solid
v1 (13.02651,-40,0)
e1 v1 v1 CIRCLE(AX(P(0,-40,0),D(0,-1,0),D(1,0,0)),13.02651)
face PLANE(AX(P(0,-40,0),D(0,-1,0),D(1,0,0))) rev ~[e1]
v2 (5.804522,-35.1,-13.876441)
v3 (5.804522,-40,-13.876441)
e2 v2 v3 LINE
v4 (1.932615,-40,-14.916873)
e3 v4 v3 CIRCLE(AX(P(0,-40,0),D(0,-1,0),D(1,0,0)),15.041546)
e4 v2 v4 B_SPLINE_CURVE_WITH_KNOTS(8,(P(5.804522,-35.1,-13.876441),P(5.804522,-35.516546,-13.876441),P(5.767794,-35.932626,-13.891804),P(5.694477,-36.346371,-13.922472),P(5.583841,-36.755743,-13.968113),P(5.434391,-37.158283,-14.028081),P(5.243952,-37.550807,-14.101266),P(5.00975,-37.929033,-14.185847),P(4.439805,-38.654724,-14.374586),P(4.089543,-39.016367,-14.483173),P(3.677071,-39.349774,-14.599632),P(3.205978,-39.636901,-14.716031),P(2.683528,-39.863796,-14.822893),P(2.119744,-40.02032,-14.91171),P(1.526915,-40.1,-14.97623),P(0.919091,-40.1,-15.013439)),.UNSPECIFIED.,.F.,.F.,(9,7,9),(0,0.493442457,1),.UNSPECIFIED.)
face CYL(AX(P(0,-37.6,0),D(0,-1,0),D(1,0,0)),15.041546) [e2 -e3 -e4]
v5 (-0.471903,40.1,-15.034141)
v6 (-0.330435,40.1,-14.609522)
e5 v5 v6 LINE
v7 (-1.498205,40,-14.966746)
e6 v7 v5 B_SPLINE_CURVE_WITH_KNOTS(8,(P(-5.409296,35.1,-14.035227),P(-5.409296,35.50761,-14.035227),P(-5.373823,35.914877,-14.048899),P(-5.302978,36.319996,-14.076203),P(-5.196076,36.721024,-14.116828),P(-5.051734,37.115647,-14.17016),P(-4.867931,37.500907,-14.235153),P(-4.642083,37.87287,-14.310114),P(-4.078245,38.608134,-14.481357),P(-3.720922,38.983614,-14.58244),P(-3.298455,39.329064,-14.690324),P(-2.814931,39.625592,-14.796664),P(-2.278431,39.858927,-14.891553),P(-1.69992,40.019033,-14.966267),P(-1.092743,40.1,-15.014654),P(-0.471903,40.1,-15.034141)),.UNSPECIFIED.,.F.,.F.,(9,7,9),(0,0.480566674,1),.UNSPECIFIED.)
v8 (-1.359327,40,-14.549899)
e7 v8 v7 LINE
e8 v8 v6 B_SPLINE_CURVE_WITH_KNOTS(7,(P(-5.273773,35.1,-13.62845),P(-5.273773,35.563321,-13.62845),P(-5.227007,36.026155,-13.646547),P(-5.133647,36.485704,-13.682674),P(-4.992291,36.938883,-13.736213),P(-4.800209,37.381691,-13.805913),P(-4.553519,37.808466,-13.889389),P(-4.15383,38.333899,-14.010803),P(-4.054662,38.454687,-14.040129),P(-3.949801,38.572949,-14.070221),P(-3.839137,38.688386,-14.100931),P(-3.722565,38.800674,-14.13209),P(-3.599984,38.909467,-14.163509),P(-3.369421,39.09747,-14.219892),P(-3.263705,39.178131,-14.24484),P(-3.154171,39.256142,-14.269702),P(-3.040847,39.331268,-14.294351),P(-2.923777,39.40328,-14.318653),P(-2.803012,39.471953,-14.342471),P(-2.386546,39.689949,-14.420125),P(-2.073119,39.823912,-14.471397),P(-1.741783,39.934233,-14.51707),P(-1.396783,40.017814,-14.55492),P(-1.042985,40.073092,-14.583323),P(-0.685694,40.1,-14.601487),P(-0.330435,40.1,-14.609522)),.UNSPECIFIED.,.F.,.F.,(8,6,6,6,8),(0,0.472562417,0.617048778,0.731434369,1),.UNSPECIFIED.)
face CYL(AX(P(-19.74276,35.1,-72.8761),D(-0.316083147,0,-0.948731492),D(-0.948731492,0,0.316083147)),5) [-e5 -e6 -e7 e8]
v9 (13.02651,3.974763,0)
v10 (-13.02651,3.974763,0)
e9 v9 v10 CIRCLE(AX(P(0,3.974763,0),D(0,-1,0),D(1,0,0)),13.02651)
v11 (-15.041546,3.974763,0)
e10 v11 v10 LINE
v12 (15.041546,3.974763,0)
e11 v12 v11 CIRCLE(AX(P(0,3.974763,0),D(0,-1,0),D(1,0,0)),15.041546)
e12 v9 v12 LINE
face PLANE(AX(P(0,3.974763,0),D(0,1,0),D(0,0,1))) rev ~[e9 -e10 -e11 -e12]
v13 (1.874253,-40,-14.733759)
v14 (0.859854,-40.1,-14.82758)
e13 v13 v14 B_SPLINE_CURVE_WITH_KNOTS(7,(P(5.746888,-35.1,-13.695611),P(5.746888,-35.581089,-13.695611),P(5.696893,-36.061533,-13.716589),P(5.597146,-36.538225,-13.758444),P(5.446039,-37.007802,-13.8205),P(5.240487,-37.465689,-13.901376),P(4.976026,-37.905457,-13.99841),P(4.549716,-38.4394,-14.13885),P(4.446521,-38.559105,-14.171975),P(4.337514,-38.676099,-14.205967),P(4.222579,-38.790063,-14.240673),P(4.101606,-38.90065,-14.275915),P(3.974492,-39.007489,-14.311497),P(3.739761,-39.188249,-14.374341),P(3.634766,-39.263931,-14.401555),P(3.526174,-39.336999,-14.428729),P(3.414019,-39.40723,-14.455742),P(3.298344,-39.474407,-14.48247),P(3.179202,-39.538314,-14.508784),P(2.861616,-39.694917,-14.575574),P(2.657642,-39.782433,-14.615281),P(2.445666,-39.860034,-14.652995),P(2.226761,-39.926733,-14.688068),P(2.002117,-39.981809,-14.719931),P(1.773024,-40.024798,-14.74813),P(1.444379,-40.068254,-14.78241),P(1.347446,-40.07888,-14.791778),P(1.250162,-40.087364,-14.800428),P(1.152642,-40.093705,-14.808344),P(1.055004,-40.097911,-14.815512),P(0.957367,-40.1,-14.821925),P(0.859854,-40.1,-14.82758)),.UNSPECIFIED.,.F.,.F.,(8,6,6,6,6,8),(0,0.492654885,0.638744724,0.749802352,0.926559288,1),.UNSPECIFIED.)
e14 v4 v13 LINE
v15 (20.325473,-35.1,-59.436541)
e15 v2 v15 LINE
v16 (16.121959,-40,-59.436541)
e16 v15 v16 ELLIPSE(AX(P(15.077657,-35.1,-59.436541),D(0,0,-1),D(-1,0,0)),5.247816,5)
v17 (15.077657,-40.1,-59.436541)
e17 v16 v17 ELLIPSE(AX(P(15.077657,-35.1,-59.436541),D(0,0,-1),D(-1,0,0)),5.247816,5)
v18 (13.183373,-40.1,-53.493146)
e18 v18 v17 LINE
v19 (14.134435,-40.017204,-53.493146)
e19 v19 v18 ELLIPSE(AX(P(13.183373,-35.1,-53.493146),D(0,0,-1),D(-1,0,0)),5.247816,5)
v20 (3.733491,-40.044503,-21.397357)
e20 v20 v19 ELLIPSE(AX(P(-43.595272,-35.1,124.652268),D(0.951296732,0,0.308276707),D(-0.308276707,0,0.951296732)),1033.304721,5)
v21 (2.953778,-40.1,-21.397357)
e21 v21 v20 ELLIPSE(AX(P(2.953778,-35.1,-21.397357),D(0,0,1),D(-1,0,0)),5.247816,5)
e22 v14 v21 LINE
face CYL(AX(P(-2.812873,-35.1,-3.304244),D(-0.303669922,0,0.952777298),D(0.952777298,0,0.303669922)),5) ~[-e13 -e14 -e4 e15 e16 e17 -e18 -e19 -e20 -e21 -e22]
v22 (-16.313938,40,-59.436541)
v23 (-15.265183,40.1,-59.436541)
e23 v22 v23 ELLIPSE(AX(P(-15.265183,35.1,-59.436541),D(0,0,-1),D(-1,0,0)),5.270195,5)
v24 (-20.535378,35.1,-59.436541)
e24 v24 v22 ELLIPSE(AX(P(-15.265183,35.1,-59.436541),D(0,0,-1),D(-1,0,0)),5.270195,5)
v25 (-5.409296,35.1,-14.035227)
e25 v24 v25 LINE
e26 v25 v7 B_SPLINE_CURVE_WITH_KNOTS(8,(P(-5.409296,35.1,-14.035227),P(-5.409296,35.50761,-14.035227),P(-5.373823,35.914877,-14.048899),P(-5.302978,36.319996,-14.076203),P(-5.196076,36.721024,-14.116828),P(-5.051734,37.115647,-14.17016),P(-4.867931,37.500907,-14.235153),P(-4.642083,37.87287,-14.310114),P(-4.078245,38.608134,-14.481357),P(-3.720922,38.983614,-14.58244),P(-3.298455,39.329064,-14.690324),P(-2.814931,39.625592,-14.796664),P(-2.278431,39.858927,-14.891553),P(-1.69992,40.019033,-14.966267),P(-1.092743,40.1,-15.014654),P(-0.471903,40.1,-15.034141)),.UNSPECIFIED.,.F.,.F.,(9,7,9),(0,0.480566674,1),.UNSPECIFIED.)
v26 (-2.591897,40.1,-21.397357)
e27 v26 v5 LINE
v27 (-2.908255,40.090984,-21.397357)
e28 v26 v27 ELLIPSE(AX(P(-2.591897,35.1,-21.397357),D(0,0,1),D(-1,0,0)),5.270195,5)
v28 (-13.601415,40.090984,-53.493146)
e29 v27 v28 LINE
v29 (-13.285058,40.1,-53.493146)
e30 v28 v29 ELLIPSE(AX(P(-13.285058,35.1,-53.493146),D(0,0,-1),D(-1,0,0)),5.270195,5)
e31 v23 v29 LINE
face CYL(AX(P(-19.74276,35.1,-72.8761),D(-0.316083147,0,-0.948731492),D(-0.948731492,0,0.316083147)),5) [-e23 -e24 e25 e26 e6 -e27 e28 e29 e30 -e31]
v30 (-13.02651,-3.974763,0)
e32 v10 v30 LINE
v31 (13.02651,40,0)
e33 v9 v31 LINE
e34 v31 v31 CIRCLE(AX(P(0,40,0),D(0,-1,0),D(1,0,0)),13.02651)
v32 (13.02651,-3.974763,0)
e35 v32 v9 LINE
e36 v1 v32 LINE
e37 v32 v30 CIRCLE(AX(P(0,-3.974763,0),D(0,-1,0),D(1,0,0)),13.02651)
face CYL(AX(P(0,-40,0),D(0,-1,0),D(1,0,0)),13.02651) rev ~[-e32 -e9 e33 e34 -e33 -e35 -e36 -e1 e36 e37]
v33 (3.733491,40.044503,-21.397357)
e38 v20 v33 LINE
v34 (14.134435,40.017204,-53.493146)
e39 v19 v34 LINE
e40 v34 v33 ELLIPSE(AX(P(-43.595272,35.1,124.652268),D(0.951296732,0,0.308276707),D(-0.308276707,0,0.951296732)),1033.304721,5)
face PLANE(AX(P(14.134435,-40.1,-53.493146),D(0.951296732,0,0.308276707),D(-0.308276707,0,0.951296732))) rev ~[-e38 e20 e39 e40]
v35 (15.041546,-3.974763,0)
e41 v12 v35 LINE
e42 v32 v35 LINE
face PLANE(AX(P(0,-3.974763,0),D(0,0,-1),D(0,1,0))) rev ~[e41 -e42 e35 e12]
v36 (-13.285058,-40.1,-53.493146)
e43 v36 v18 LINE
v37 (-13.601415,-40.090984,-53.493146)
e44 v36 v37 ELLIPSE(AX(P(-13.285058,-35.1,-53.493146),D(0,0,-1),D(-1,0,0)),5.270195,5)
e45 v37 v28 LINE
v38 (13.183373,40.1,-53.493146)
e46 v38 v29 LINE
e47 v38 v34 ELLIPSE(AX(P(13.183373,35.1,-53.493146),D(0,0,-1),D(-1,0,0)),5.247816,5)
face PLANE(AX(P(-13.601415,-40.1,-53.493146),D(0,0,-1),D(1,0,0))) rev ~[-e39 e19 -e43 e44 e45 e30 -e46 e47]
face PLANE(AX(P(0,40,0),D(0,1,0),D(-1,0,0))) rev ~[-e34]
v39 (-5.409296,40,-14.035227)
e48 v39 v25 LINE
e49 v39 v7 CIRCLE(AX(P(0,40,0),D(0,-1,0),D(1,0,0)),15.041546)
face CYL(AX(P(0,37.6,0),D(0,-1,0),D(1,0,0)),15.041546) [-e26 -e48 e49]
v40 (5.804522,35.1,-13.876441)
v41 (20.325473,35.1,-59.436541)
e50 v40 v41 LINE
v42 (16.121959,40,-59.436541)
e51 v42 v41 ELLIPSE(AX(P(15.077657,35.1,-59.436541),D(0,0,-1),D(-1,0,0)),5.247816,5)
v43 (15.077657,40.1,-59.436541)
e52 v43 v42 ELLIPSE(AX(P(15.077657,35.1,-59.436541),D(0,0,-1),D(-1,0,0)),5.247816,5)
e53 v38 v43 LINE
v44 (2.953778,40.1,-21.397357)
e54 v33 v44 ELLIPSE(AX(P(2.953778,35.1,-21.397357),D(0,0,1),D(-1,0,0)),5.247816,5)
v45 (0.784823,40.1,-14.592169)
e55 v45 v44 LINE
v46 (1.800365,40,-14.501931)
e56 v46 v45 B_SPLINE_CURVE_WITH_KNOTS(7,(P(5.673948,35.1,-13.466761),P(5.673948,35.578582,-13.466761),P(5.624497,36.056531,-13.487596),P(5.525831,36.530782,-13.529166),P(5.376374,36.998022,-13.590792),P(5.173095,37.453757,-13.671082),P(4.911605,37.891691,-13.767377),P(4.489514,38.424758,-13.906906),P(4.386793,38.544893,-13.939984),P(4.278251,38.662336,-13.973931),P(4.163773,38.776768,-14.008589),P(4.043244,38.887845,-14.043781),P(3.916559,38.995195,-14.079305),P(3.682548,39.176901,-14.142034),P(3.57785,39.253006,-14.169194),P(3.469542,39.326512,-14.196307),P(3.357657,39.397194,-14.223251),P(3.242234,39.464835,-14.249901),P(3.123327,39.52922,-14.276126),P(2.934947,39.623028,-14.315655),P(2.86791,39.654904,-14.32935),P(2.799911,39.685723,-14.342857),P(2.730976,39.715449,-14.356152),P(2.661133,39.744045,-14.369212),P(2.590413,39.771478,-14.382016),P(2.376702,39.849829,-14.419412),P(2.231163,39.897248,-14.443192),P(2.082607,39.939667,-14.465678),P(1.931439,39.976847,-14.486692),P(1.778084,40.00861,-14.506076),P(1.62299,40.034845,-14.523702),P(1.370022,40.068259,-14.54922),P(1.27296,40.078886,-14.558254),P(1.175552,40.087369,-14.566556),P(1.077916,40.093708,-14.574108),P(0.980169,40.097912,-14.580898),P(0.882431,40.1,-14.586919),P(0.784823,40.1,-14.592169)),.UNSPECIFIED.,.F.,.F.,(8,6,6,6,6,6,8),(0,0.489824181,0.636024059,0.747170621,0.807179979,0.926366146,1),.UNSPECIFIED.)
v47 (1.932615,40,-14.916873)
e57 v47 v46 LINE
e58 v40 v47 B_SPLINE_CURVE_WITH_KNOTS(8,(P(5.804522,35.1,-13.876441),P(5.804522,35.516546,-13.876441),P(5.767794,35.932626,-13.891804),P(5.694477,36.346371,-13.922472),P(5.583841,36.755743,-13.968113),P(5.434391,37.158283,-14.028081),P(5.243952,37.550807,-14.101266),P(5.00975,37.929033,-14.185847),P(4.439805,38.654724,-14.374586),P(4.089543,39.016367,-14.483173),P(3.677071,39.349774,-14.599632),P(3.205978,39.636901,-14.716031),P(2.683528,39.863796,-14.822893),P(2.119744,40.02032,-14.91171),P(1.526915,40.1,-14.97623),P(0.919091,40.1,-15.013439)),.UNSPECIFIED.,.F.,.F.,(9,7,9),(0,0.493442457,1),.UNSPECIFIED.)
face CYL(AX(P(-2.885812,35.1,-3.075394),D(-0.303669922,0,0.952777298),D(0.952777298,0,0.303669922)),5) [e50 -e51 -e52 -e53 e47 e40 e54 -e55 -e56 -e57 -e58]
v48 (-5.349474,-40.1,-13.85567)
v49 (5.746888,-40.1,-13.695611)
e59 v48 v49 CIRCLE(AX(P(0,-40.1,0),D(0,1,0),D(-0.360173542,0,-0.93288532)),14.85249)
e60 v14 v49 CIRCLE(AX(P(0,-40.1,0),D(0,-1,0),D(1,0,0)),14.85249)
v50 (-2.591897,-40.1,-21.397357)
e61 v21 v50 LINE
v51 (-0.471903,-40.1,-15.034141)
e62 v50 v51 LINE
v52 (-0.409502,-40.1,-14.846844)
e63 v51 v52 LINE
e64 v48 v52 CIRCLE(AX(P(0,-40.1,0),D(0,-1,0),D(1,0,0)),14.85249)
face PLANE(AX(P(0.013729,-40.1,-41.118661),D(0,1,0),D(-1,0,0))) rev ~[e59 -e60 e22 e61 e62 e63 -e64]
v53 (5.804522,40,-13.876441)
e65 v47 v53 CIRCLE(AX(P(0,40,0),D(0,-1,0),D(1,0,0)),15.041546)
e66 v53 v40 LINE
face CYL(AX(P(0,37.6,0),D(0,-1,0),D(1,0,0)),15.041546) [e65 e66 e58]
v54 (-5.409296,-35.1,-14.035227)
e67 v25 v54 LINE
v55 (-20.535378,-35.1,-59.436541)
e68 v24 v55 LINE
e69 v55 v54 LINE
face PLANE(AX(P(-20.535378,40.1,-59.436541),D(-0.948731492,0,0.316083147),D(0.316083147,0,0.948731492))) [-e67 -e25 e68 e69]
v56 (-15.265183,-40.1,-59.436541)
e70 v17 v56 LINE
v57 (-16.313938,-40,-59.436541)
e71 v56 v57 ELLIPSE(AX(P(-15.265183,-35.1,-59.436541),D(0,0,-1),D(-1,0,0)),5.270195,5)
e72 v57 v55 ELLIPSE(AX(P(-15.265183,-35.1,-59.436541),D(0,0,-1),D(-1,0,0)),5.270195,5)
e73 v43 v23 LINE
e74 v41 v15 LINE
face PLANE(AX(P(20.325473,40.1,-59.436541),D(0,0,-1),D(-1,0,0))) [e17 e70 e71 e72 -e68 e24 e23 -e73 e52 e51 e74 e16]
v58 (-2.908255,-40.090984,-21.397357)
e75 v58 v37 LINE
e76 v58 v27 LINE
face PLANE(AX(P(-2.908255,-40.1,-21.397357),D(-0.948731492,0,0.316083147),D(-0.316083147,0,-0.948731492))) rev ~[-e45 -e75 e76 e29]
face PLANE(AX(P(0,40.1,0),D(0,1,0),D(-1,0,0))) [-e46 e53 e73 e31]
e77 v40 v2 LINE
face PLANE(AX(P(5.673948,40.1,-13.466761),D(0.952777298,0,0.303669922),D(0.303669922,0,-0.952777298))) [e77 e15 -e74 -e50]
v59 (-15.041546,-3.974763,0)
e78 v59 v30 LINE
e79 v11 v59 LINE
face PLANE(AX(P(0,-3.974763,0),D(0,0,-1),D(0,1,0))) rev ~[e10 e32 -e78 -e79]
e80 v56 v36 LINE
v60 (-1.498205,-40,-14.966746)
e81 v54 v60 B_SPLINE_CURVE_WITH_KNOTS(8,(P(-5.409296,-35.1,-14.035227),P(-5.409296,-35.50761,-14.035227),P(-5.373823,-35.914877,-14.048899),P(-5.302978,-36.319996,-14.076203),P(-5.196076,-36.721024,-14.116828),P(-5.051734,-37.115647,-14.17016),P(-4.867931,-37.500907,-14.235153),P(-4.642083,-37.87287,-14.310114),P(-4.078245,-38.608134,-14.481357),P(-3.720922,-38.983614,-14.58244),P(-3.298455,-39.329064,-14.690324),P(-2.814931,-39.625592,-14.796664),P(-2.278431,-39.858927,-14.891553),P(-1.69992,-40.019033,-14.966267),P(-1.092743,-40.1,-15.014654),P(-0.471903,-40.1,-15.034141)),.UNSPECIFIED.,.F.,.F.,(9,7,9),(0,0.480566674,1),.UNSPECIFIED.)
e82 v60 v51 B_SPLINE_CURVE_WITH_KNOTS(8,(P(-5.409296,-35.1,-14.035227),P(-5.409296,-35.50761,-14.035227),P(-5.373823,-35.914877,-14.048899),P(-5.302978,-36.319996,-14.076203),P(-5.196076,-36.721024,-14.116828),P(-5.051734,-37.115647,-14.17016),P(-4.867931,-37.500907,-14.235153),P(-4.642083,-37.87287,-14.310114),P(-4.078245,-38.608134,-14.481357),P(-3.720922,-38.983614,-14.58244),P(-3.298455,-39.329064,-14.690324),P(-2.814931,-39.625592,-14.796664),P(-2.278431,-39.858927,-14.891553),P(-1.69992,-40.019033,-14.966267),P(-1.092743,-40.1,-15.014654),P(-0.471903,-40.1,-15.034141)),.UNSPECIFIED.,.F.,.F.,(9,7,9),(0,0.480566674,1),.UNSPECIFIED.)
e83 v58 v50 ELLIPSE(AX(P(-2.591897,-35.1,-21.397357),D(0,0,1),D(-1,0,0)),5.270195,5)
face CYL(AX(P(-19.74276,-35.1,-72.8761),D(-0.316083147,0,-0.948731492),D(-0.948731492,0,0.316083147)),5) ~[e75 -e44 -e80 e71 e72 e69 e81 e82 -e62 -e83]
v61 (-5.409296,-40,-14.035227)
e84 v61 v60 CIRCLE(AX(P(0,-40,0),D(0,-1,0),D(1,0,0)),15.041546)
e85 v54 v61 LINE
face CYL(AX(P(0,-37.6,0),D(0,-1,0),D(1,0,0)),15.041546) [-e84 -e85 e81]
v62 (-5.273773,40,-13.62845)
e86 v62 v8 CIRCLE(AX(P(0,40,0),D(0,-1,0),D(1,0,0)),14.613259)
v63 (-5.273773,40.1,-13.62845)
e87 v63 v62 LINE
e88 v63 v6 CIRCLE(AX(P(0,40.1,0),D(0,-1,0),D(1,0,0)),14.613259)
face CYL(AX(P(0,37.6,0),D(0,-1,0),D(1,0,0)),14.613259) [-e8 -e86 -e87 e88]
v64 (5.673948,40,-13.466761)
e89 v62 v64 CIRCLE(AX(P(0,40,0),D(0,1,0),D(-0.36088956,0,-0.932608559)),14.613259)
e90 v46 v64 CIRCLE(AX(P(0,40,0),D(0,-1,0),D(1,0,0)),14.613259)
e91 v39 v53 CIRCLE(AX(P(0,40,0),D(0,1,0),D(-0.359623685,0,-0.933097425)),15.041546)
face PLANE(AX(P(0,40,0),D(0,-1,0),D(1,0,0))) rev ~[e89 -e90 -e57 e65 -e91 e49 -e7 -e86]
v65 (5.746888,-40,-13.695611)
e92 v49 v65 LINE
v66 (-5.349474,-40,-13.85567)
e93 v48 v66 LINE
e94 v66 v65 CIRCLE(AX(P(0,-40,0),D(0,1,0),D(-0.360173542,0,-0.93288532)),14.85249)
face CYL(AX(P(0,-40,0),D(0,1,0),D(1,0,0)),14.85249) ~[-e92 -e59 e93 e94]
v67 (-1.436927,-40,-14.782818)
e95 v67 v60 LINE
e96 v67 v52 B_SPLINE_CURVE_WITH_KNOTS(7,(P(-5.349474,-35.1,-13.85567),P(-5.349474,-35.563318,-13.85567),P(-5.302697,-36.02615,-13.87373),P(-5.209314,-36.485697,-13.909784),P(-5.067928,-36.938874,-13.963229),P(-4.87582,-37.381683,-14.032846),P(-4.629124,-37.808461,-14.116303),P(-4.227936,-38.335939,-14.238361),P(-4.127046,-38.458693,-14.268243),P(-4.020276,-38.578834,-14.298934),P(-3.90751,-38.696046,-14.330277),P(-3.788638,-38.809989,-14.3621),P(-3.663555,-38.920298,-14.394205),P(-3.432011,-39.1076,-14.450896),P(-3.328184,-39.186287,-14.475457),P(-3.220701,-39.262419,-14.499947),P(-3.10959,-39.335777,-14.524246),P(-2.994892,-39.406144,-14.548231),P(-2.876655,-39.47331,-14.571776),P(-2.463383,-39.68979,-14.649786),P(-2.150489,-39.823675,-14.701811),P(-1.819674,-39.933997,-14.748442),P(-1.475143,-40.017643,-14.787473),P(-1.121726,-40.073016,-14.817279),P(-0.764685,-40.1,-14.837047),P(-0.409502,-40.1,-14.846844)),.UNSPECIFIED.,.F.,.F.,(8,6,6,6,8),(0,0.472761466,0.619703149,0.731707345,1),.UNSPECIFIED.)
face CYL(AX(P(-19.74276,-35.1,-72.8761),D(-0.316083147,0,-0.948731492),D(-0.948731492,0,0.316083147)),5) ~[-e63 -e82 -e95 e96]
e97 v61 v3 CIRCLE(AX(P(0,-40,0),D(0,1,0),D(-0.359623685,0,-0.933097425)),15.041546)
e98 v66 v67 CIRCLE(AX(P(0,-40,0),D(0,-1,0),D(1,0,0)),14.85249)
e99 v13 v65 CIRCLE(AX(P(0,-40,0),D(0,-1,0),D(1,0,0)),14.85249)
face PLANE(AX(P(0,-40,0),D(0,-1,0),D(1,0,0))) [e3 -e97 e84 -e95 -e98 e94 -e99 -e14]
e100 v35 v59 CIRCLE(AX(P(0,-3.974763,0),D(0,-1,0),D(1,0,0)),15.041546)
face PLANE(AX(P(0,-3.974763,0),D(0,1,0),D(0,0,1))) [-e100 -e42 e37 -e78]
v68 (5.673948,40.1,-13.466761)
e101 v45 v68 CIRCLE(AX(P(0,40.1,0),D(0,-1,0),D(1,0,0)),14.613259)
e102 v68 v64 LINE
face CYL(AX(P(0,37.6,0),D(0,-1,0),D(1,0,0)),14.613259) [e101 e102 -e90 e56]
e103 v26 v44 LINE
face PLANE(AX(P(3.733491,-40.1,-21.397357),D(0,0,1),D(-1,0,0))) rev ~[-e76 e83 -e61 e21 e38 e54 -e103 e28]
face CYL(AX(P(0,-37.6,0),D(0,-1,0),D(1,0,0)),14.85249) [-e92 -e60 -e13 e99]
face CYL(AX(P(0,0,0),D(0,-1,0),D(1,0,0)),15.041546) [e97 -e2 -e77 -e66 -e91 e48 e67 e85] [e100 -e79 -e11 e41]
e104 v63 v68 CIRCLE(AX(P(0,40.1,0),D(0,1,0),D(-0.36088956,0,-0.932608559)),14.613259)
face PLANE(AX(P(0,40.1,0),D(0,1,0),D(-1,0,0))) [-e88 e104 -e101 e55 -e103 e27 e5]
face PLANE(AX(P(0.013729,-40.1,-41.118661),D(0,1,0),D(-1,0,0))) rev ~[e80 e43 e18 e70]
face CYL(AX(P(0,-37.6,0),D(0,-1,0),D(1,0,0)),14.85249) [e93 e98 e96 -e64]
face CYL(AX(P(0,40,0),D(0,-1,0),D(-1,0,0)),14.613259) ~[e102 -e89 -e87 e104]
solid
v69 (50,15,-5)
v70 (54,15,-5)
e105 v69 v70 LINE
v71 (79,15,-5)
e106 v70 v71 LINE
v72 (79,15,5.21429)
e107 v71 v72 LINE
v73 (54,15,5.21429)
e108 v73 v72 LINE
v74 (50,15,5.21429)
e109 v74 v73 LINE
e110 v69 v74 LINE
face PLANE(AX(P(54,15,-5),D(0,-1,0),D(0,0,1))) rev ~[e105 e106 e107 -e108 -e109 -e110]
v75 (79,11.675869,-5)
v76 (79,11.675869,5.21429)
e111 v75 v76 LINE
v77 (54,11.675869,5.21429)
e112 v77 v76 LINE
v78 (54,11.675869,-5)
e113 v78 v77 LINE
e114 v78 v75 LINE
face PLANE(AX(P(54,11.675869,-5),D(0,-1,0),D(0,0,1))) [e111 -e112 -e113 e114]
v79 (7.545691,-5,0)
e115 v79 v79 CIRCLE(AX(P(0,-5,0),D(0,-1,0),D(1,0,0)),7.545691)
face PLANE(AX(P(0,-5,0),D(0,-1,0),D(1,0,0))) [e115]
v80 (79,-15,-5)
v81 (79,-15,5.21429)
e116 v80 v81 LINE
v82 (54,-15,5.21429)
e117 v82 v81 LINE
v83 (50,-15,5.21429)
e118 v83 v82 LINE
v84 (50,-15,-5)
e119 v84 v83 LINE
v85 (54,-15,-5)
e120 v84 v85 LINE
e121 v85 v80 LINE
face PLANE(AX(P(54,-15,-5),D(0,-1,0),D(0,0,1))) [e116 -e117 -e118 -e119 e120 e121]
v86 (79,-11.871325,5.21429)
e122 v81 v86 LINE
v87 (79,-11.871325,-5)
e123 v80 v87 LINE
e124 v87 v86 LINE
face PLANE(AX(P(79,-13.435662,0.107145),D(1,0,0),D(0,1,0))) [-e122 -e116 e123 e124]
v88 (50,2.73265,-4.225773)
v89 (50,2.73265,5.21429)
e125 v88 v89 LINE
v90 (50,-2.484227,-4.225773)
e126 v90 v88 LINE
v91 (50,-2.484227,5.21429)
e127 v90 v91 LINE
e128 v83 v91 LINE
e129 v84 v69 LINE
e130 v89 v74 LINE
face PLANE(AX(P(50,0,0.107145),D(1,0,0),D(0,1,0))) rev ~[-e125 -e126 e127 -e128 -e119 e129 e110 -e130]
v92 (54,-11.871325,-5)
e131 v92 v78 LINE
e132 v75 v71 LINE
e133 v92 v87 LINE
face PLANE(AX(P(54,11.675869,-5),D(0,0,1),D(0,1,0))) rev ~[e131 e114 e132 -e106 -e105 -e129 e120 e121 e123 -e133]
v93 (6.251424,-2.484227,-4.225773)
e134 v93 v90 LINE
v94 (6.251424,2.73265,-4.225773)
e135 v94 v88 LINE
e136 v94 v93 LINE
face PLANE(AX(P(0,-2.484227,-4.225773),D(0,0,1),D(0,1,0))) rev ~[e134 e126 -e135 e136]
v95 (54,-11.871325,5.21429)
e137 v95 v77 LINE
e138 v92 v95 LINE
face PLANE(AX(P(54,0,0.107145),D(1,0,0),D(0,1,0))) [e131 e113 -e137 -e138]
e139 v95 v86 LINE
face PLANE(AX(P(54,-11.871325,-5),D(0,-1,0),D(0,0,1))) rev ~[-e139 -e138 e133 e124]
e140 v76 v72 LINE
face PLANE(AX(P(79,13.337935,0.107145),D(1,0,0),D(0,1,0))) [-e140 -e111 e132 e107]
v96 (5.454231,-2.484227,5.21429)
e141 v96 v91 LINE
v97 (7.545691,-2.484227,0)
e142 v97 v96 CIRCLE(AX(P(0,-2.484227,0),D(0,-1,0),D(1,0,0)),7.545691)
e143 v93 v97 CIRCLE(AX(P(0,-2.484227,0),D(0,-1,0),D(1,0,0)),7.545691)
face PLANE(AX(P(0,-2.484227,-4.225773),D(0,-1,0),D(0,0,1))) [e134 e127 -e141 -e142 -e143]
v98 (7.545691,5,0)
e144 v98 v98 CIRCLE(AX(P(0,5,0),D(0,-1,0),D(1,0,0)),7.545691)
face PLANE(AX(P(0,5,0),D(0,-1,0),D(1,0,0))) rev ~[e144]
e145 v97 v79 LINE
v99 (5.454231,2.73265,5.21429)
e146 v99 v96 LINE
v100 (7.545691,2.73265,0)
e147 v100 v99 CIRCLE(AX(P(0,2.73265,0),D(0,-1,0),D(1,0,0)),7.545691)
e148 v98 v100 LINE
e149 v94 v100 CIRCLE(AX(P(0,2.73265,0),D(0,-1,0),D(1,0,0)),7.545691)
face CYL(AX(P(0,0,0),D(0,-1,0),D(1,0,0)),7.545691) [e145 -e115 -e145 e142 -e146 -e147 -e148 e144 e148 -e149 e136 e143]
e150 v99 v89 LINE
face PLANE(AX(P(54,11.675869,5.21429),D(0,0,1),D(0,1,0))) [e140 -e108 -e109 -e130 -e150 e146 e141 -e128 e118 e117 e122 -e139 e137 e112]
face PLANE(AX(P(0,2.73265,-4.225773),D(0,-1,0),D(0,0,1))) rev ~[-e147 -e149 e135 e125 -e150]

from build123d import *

# Parameters (mm, degrees)
F0_R          = 15.0415455236
F1_DEPTH      = 40
F2_R          = 13.0265097032
F3_DEPTH      = 80
F4_W          = 7.9495264217
F4_H          = 15.6480446458
F5_DEPTH      = 17.5
F6_R          = 7.5456912494
F7_DEPTH      = 5
F8_W          = 5.216877209
F8_H          = 9.4400634989
F9_DEPTH      = 50
F10_W         = 30
F10_H         = 10.2142902277
F11_DEPTH     = 4
F12_W         = 3.1286751479
F12_H         = 10.2142902277
F13_DEPTH     = 25
F14_W         = 3.3241308853
F14_H         = 10.2142902277
F15_DEPTH     = 25
F16_R         = 14.8524902499
F17_DEPTH     = 0.1
F18_R         = 14.6132587067
F19_DEPTH     = 0.1
F21_DEPTH     = 80.2
F23_DEPTH     = 80.201
F24_T4_DEPTH  = 73.2481904339
F24_S5_R      = 14.6132587067
F24_T6_DEPTH  = 40
F24_T11_DEPTH = 73.2481904339
F24_S12_R     = 15.0415455236
F24_T13_DEPTH = 40
F24_T17_DEPTH = 73.2835146544
F24_S18_R     = 15.0415455236
F24_T19_DEPTH = 40
F24_T23_DEPTH = 73.2835146544
F24_S24_R     = 14.6132587067
F24_T25_DEPTH = 40
F24_T30_DEPTH = 73.0440159481
F24_S31_R     = 15.0415455236
F24_T32_DEPTH = 40
F24_T36_DEPTH = 73.0440159481
F24_S37_R     = 14.8524902499
F24_T38_DEPTH = 40
F24_T43_DEPTH = 73.0079978677
F24_S44_R     = 14.8524902499
F24_T45_DEPTH = 40
F24_T50_DEPTH = 73.0079978677
F24_S51_R     = 15.0415455236
F24_T52_DEPTH = 40


# Not quite as in the source:
# - a fillet or chamfer that OpenCascade refuses, or shapes differently, is made with other operations: its cross-section is extruded or revolved along the edge and cut away or added


with BuildPart() as f1:
    # F0 (on Front) → F1 (new body, symmetric)
    with BuildSketch(Plane.XZ):
        Circle(F0_R)
    extrude(amount=F1_DEPTH, both=True)

    # F2 (on face) → F3 (cut)
    with BuildSketch(Plane.XZ.offset(40)):
        Circle(F2_R)
    extrude(amount=-F3_DEPTH, mode=Mode.SUBTRACT)

    # F4 (on Right) → F5 (cut, symmetric)
    with BuildSketch(Plane.YZ):
        with Locations((0, 7.8240223229)):
            Rectangle(F4_W, F4_H)
    extrude(amount=F5_DEPTH, both=True, mode=Mode.SUBTRACT)

    # F16 (on face) → F17 (join)
    with BuildSketch(Plane.XZ.offset(40)):
        Circle(F16_R)
    extrude(amount=F17_DEPTH)

    # F18 (on face) → F19 (join)
    with BuildSketch(Plane(origin=(0, 40, 0), x_dir=(-1, 0, 0), z_dir=(0, 1, 0))):
        Circle(F18_R)
    extrude(amount=F19_DEPTH)

    # F20 (on face) → F21 (join)
    with BuildSketch(Plane(origin=(0, 40.1, 0), x_dir=(-1, 0, 0), z_dir=(0, 1, 0))):
        Polygon((5.2737725107, -13.6284501516), (-5.6739483665, -13.4667605594), (-20.3254725784, -59.4365410507), (20.5353777856, -59.4365410507), align=None)
    extrude(amount=-F21_DEPTH)

    # F22 (on face) → F23 (cut, through all)
    with BuildSketch(Plane.XZ.offset(40.1)):
        Polygon((-2.9082546706, -21.3973574286), (-13.6014148593, -53.4931458533), (14.1344349831, -53.4931458533), (3.7334910594, -21.3973574286), align=None)
    extrude(amount=-F23_DEPTH, mode=Mode.SUBTRACT)

    # F24: fillet of radius 5 on 4 edges, made by hand


with BuildPart() as f7:
    # F6 (on Front) → F7 (new body, symmetric)
    with BuildSketch(Plane.XZ):
        Circle(F6_R)
    extrude(amount=F7_DEPTH, both=True)

    # F8 (on Right) → F9 (join)
    with BuildSketch(Plane.YZ):
        with Locations((0.1242113067, 0.4942584783)):
            Rectangle(F8_W, F8_H)
    extrude(amount=F9_DEPTH)

    # F10 (on face) → F11 (join)
    with BuildSketch(Plane.YZ.offset(50)):
        with Locations((0, 0.1071451139)):
            Rectangle(F10_W, F10_H)
    extrude(amount=F11_DEPTH)

    # F12 (on face) → F13 (join)
    with BuildSketch(Plane.YZ.offset(54)):
        with Locations((-13.4356624261, 0.1071451139)):
            Rectangle(F12_W, F12_H)
    extrude(amount=F13_DEPTH)

    # F14 (on face) → F15 (join)
    with BuildSketch(Plane.YZ.offset(54)):
        with Locations((13.3379345573, 0.1071451139)):
            Rectangle(F14_W, F14_H)
    extrude(amount=F15_DEPTH)


with BuildPart() as f24_tool2:
    # F24_s3 → F24_t4 (new body)
    with BuildSketch(Plane(origin=(0.6236867561, 0, -1.9568437291), x_dir=(0, 1, 0), z_dir=(0.3036699217, 0, -0.9527772975))):
        with BuildLine():
            ThreePointArc((35.1, 1.3165590661), (38.6355339059, -0.147907028), (40.1, -3.6834409339))
            Line((40.1, -3.6834409339), (40.1, 1.3165590661))
            Line((40.1, 1.3165590661), (35.1, 1.3165590661))
        make_face()
    extrude(amount=F24_T4_DEPTH)

    # F24_s5 → F24_t6 (cut, symmetric)
    with BuildSketch(Plane.XZ.offset(-37.6)):
        Circle(F24_S5_R)
    extrude(amount=F24_T6_DEPTH, both=True, mode=Mode.SUBTRACT)

    split(bisect_by=Plane.XZ.offset(-40), keep=Keep.BOTTOM)


with BuildPart() as f1_1:
    add(f1.part)

    # F24_t1: cut F24_tool2
    add(f24_tool2.part, mode=Mode.SUBTRACT)


with BuildPart() as f24_tool9:
    # F24_s10 → F24_t11 (new body)
    with BuildSketch(Plane(origin=(0.6236867561, 0, -1.9568437291), x_dir=(0, 1, 0), z_dir=(0.3036699217, 0, -0.9527772975))):
        with BuildLine():
            ThreePointArc((35.1, 1.3165590661), (38.6355339059, -0.147907028), (40.1, -3.6834409339))
            Line((40.1, -3.6834409339), (40.1, 1.3165590661))
            Line((40.1, 1.3165590661), (35.1, 1.3165590661))
        make_face()
    extrude(amount=F24_T11_DEPTH)

    # F24_s12 → F24_t13 (cut, symmetric)
    with BuildSketch(Plane.XZ.offset(-37.6)):
        Circle(F24_S12_R)
    extrude(amount=F24_T13_DEPTH, both=True, mode=Mode.SUBTRACT)


with BuildPart() as f1_2:
    add(f1_1.part)

    # F24_t8: cut F24_tool9
    add(f24_tool9.part, mode=Mode.SUBTRACT)


with BuildPart() as f24_tool15:
    # F24_s16 → F24_t17 (new body)
    with BuildSketch(Plane(origin=(-23.8264124769, 0, -71.5155744685), x_dir=(0, 1, 0), z_dir=(0.3160831473, 0, 0.948731492))):
        with BuildLine():
            ThreePointArc((35.1, 0.695670646), (38.6355339059, -0.7687954481), (40.1, -4.304329354))
            Line((40.1, -4.304329354), (40.1, 0.695670646))
            Line((40.1, 0.695670646), (35.1, 0.695670646))
        make_face()
    extrude(amount=F24_T17_DEPTH)

    # F24_s18 → F24_t19 (cut, symmetric)
    with BuildSketch(Plane.XZ.offset(-37.6)):
        Circle(F24_S18_R)
    extrude(amount=F24_T19_DEPTH, both=True, mode=Mode.SUBTRACT)


with BuildPart() as f1_3:
    add(f1_2.part)

    # F24_t14: cut F24_tool15
    add(f24_tool15.part, mode=Mode.SUBTRACT)


with BuildPart() as f24_tool21:
    # F24_s22 → F24_t23 (new body)
    with BuildSketch(Plane(origin=(-23.8264124769, 0, -71.5155744685), x_dir=(0, 1, 0), z_dir=(0.3160831473, 0, 0.948731492))):
        with BuildLine():
            ThreePointArc((35.1, 0.695670646), (38.6355339059, -0.7687954481), (40.1, -4.304329354))
            Line((40.1, -4.304329354), (40.1, 0.695670646))
            Line((40.1, 0.695670646), (35.1, 0.695670646))
        make_face()
    extrude(amount=F24_T23_DEPTH)

    # F24_s24 → F24_t25 (cut, symmetric)
    with BuildSketch(Plane.XZ.offset(-37.6)):
        Circle(F24_S24_R)
    extrude(amount=F24_T25_DEPTH, both=True, mode=Mode.SUBTRACT)

    split(bisect_by=Plane.XZ.offset(-40), keep=Keep.BOTTOM)


with BuildPart() as f1_4:
    add(f1_3.part)

    # F24_t20: cut F24_tool21
    add(f24_tool21.part, mode=Mode.SUBTRACT)


with BuildPart() as f24_tool28:
    # F24_s29 → F24_t30 (new body)
    with BuildSketch(Plane(origin=(-23.8264124769, 0, -71.5155744685), x_dir=(0, 1, 0), z_dir=(0.3160831473, 0, 0.948731492))):
        with BuildLine():
            ThreePointArc((-35.1, 0.695670646), (-38.6355339059, -0.7687954481), (-40.1, -4.304329354))
            Line((-40.1, -4.304329354), (-40.1, 0.695670646))
            Line((-40.1, 0.695670646), (-35.1, 0.695670646))
        make_face()
    extrude(amount=F24_T30_DEPTH)

    # F24_s31 → F24_t32 (cut, symmetric)
    with BuildSketch(Plane.XZ.offset(37.6)):
        Circle(F24_S31_R)
    extrude(amount=F24_T32_DEPTH, both=True, mode=Mode.SUBTRACT)


with BuildPart() as f1_5:
    add(f1_4.part)

    # F24_t27: cut F24_tool28
    add(f24_tool28.part, mode=Mode.SUBTRACT)


with BuildPart() as f24_tool34:
    # F24_s35 → F24_t36 (new body)
    with BuildSketch(Plane(origin=(-23.8264124769, 0, -71.5155744685), x_dir=(0, 1, 0), z_dir=(0.3160831473, 0, 0.948731492))):
        with BuildLine():
            ThreePointArc((-35.1, 0.695670646), (-38.6355339059, -0.7687954481), (-40.1, -4.304329354))
            Line((-40.1, -4.304329354), (-40.1, 0.695670646))
            Line((-40.1, 0.695670646), (-35.1, 0.695670646))
        make_face()
    extrude(amount=F24_T36_DEPTH)

    # F24_s37 → F24_t38 (cut, symmetric)
    with BuildSketch(Plane.XZ.offset(37.6)):
        Circle(F24_S37_R)
    extrude(amount=F24_T38_DEPTH, both=True, mode=Mode.SUBTRACT)

    split(bisect_by=Plane.XZ.offset(40), keep=Keep.TOP)


with BuildPart() as f1_6:
    add(f1_5.part)

    # F24_t33: cut F24_tool34
    add(f24_tool34.part, mode=Mode.SUBTRACT)


with BuildPart() as f24_tool41:
    # F24_s42 → F24_t43 (new body)
    with BuildSketch(Plane(origin=(0.6966260139, 0, -2.1856937532), x_dir=(0, 1, 0), z_dir=(0.3036699217, 0, -0.9527772975))):
        with BuildLine():
            ThreePointArc((-35.1, 1.3165590661), (-38.6355339059, -0.147907028), (-40.1, -3.6834409339))
            Line((-40.1, -3.6834409339), (-40.1, 1.3165590661))
            Line((-40.1, 1.3165590661), (-35.1, 1.3165590661))
        make_face()
    extrude(amount=F24_T43_DEPTH)

    # F24_s44 → F24_t45 (cut, symmetric)
    with BuildSketch(Plane.XZ.offset(37.6)):
        Circle(F24_S44_R)
    extrude(amount=F24_T45_DEPTH, both=True, mode=Mode.SUBTRACT)

    split(bisect_by=Plane.XZ.offset(40), keep=Keep.TOP)


with BuildPart() as f1_7:
    add(f1_6.part)

    # F24_t40: cut F24_tool41
    add(f24_tool41.part, mode=Mode.SUBTRACT)


with BuildPart() as f24_tool48:
    # F24_s49 → F24_t50 (new body)
    with BuildSketch(Plane(origin=(0.6966260139, 0, -2.1856937532), x_dir=(0, 1, 0), z_dir=(0.3036699217, 0, -0.9527772975))):
        with BuildLine():
            ThreePointArc((-35.1, 1.3165590661), (-38.6355339059, -0.147907028), (-40.1, -3.6834409339))
            Line((-40.1, -3.6834409339), (-40.1, 1.3165590661))
            Line((-40.1, 1.3165590661), (-35.1, 1.3165590661))
        make_face()
    extrude(amount=F24_T50_DEPTH)

    # F24_s51 → F24_t52 (cut, symmetric)
    with BuildSketch(Plane.XZ.offset(37.6)):
        Circle(F24_S51_R)
    extrude(amount=F24_T52_DEPTH, both=True, mode=Mode.SUBTRACT)


with BuildPart() as f1_8:
    add(f1_7.part)

    # F24_t47: cut F24_tool48
    add(f24_tool48.part, mode=Mode.SUBTRACT)


solid = Compound([f7.part, f1_8.part])
